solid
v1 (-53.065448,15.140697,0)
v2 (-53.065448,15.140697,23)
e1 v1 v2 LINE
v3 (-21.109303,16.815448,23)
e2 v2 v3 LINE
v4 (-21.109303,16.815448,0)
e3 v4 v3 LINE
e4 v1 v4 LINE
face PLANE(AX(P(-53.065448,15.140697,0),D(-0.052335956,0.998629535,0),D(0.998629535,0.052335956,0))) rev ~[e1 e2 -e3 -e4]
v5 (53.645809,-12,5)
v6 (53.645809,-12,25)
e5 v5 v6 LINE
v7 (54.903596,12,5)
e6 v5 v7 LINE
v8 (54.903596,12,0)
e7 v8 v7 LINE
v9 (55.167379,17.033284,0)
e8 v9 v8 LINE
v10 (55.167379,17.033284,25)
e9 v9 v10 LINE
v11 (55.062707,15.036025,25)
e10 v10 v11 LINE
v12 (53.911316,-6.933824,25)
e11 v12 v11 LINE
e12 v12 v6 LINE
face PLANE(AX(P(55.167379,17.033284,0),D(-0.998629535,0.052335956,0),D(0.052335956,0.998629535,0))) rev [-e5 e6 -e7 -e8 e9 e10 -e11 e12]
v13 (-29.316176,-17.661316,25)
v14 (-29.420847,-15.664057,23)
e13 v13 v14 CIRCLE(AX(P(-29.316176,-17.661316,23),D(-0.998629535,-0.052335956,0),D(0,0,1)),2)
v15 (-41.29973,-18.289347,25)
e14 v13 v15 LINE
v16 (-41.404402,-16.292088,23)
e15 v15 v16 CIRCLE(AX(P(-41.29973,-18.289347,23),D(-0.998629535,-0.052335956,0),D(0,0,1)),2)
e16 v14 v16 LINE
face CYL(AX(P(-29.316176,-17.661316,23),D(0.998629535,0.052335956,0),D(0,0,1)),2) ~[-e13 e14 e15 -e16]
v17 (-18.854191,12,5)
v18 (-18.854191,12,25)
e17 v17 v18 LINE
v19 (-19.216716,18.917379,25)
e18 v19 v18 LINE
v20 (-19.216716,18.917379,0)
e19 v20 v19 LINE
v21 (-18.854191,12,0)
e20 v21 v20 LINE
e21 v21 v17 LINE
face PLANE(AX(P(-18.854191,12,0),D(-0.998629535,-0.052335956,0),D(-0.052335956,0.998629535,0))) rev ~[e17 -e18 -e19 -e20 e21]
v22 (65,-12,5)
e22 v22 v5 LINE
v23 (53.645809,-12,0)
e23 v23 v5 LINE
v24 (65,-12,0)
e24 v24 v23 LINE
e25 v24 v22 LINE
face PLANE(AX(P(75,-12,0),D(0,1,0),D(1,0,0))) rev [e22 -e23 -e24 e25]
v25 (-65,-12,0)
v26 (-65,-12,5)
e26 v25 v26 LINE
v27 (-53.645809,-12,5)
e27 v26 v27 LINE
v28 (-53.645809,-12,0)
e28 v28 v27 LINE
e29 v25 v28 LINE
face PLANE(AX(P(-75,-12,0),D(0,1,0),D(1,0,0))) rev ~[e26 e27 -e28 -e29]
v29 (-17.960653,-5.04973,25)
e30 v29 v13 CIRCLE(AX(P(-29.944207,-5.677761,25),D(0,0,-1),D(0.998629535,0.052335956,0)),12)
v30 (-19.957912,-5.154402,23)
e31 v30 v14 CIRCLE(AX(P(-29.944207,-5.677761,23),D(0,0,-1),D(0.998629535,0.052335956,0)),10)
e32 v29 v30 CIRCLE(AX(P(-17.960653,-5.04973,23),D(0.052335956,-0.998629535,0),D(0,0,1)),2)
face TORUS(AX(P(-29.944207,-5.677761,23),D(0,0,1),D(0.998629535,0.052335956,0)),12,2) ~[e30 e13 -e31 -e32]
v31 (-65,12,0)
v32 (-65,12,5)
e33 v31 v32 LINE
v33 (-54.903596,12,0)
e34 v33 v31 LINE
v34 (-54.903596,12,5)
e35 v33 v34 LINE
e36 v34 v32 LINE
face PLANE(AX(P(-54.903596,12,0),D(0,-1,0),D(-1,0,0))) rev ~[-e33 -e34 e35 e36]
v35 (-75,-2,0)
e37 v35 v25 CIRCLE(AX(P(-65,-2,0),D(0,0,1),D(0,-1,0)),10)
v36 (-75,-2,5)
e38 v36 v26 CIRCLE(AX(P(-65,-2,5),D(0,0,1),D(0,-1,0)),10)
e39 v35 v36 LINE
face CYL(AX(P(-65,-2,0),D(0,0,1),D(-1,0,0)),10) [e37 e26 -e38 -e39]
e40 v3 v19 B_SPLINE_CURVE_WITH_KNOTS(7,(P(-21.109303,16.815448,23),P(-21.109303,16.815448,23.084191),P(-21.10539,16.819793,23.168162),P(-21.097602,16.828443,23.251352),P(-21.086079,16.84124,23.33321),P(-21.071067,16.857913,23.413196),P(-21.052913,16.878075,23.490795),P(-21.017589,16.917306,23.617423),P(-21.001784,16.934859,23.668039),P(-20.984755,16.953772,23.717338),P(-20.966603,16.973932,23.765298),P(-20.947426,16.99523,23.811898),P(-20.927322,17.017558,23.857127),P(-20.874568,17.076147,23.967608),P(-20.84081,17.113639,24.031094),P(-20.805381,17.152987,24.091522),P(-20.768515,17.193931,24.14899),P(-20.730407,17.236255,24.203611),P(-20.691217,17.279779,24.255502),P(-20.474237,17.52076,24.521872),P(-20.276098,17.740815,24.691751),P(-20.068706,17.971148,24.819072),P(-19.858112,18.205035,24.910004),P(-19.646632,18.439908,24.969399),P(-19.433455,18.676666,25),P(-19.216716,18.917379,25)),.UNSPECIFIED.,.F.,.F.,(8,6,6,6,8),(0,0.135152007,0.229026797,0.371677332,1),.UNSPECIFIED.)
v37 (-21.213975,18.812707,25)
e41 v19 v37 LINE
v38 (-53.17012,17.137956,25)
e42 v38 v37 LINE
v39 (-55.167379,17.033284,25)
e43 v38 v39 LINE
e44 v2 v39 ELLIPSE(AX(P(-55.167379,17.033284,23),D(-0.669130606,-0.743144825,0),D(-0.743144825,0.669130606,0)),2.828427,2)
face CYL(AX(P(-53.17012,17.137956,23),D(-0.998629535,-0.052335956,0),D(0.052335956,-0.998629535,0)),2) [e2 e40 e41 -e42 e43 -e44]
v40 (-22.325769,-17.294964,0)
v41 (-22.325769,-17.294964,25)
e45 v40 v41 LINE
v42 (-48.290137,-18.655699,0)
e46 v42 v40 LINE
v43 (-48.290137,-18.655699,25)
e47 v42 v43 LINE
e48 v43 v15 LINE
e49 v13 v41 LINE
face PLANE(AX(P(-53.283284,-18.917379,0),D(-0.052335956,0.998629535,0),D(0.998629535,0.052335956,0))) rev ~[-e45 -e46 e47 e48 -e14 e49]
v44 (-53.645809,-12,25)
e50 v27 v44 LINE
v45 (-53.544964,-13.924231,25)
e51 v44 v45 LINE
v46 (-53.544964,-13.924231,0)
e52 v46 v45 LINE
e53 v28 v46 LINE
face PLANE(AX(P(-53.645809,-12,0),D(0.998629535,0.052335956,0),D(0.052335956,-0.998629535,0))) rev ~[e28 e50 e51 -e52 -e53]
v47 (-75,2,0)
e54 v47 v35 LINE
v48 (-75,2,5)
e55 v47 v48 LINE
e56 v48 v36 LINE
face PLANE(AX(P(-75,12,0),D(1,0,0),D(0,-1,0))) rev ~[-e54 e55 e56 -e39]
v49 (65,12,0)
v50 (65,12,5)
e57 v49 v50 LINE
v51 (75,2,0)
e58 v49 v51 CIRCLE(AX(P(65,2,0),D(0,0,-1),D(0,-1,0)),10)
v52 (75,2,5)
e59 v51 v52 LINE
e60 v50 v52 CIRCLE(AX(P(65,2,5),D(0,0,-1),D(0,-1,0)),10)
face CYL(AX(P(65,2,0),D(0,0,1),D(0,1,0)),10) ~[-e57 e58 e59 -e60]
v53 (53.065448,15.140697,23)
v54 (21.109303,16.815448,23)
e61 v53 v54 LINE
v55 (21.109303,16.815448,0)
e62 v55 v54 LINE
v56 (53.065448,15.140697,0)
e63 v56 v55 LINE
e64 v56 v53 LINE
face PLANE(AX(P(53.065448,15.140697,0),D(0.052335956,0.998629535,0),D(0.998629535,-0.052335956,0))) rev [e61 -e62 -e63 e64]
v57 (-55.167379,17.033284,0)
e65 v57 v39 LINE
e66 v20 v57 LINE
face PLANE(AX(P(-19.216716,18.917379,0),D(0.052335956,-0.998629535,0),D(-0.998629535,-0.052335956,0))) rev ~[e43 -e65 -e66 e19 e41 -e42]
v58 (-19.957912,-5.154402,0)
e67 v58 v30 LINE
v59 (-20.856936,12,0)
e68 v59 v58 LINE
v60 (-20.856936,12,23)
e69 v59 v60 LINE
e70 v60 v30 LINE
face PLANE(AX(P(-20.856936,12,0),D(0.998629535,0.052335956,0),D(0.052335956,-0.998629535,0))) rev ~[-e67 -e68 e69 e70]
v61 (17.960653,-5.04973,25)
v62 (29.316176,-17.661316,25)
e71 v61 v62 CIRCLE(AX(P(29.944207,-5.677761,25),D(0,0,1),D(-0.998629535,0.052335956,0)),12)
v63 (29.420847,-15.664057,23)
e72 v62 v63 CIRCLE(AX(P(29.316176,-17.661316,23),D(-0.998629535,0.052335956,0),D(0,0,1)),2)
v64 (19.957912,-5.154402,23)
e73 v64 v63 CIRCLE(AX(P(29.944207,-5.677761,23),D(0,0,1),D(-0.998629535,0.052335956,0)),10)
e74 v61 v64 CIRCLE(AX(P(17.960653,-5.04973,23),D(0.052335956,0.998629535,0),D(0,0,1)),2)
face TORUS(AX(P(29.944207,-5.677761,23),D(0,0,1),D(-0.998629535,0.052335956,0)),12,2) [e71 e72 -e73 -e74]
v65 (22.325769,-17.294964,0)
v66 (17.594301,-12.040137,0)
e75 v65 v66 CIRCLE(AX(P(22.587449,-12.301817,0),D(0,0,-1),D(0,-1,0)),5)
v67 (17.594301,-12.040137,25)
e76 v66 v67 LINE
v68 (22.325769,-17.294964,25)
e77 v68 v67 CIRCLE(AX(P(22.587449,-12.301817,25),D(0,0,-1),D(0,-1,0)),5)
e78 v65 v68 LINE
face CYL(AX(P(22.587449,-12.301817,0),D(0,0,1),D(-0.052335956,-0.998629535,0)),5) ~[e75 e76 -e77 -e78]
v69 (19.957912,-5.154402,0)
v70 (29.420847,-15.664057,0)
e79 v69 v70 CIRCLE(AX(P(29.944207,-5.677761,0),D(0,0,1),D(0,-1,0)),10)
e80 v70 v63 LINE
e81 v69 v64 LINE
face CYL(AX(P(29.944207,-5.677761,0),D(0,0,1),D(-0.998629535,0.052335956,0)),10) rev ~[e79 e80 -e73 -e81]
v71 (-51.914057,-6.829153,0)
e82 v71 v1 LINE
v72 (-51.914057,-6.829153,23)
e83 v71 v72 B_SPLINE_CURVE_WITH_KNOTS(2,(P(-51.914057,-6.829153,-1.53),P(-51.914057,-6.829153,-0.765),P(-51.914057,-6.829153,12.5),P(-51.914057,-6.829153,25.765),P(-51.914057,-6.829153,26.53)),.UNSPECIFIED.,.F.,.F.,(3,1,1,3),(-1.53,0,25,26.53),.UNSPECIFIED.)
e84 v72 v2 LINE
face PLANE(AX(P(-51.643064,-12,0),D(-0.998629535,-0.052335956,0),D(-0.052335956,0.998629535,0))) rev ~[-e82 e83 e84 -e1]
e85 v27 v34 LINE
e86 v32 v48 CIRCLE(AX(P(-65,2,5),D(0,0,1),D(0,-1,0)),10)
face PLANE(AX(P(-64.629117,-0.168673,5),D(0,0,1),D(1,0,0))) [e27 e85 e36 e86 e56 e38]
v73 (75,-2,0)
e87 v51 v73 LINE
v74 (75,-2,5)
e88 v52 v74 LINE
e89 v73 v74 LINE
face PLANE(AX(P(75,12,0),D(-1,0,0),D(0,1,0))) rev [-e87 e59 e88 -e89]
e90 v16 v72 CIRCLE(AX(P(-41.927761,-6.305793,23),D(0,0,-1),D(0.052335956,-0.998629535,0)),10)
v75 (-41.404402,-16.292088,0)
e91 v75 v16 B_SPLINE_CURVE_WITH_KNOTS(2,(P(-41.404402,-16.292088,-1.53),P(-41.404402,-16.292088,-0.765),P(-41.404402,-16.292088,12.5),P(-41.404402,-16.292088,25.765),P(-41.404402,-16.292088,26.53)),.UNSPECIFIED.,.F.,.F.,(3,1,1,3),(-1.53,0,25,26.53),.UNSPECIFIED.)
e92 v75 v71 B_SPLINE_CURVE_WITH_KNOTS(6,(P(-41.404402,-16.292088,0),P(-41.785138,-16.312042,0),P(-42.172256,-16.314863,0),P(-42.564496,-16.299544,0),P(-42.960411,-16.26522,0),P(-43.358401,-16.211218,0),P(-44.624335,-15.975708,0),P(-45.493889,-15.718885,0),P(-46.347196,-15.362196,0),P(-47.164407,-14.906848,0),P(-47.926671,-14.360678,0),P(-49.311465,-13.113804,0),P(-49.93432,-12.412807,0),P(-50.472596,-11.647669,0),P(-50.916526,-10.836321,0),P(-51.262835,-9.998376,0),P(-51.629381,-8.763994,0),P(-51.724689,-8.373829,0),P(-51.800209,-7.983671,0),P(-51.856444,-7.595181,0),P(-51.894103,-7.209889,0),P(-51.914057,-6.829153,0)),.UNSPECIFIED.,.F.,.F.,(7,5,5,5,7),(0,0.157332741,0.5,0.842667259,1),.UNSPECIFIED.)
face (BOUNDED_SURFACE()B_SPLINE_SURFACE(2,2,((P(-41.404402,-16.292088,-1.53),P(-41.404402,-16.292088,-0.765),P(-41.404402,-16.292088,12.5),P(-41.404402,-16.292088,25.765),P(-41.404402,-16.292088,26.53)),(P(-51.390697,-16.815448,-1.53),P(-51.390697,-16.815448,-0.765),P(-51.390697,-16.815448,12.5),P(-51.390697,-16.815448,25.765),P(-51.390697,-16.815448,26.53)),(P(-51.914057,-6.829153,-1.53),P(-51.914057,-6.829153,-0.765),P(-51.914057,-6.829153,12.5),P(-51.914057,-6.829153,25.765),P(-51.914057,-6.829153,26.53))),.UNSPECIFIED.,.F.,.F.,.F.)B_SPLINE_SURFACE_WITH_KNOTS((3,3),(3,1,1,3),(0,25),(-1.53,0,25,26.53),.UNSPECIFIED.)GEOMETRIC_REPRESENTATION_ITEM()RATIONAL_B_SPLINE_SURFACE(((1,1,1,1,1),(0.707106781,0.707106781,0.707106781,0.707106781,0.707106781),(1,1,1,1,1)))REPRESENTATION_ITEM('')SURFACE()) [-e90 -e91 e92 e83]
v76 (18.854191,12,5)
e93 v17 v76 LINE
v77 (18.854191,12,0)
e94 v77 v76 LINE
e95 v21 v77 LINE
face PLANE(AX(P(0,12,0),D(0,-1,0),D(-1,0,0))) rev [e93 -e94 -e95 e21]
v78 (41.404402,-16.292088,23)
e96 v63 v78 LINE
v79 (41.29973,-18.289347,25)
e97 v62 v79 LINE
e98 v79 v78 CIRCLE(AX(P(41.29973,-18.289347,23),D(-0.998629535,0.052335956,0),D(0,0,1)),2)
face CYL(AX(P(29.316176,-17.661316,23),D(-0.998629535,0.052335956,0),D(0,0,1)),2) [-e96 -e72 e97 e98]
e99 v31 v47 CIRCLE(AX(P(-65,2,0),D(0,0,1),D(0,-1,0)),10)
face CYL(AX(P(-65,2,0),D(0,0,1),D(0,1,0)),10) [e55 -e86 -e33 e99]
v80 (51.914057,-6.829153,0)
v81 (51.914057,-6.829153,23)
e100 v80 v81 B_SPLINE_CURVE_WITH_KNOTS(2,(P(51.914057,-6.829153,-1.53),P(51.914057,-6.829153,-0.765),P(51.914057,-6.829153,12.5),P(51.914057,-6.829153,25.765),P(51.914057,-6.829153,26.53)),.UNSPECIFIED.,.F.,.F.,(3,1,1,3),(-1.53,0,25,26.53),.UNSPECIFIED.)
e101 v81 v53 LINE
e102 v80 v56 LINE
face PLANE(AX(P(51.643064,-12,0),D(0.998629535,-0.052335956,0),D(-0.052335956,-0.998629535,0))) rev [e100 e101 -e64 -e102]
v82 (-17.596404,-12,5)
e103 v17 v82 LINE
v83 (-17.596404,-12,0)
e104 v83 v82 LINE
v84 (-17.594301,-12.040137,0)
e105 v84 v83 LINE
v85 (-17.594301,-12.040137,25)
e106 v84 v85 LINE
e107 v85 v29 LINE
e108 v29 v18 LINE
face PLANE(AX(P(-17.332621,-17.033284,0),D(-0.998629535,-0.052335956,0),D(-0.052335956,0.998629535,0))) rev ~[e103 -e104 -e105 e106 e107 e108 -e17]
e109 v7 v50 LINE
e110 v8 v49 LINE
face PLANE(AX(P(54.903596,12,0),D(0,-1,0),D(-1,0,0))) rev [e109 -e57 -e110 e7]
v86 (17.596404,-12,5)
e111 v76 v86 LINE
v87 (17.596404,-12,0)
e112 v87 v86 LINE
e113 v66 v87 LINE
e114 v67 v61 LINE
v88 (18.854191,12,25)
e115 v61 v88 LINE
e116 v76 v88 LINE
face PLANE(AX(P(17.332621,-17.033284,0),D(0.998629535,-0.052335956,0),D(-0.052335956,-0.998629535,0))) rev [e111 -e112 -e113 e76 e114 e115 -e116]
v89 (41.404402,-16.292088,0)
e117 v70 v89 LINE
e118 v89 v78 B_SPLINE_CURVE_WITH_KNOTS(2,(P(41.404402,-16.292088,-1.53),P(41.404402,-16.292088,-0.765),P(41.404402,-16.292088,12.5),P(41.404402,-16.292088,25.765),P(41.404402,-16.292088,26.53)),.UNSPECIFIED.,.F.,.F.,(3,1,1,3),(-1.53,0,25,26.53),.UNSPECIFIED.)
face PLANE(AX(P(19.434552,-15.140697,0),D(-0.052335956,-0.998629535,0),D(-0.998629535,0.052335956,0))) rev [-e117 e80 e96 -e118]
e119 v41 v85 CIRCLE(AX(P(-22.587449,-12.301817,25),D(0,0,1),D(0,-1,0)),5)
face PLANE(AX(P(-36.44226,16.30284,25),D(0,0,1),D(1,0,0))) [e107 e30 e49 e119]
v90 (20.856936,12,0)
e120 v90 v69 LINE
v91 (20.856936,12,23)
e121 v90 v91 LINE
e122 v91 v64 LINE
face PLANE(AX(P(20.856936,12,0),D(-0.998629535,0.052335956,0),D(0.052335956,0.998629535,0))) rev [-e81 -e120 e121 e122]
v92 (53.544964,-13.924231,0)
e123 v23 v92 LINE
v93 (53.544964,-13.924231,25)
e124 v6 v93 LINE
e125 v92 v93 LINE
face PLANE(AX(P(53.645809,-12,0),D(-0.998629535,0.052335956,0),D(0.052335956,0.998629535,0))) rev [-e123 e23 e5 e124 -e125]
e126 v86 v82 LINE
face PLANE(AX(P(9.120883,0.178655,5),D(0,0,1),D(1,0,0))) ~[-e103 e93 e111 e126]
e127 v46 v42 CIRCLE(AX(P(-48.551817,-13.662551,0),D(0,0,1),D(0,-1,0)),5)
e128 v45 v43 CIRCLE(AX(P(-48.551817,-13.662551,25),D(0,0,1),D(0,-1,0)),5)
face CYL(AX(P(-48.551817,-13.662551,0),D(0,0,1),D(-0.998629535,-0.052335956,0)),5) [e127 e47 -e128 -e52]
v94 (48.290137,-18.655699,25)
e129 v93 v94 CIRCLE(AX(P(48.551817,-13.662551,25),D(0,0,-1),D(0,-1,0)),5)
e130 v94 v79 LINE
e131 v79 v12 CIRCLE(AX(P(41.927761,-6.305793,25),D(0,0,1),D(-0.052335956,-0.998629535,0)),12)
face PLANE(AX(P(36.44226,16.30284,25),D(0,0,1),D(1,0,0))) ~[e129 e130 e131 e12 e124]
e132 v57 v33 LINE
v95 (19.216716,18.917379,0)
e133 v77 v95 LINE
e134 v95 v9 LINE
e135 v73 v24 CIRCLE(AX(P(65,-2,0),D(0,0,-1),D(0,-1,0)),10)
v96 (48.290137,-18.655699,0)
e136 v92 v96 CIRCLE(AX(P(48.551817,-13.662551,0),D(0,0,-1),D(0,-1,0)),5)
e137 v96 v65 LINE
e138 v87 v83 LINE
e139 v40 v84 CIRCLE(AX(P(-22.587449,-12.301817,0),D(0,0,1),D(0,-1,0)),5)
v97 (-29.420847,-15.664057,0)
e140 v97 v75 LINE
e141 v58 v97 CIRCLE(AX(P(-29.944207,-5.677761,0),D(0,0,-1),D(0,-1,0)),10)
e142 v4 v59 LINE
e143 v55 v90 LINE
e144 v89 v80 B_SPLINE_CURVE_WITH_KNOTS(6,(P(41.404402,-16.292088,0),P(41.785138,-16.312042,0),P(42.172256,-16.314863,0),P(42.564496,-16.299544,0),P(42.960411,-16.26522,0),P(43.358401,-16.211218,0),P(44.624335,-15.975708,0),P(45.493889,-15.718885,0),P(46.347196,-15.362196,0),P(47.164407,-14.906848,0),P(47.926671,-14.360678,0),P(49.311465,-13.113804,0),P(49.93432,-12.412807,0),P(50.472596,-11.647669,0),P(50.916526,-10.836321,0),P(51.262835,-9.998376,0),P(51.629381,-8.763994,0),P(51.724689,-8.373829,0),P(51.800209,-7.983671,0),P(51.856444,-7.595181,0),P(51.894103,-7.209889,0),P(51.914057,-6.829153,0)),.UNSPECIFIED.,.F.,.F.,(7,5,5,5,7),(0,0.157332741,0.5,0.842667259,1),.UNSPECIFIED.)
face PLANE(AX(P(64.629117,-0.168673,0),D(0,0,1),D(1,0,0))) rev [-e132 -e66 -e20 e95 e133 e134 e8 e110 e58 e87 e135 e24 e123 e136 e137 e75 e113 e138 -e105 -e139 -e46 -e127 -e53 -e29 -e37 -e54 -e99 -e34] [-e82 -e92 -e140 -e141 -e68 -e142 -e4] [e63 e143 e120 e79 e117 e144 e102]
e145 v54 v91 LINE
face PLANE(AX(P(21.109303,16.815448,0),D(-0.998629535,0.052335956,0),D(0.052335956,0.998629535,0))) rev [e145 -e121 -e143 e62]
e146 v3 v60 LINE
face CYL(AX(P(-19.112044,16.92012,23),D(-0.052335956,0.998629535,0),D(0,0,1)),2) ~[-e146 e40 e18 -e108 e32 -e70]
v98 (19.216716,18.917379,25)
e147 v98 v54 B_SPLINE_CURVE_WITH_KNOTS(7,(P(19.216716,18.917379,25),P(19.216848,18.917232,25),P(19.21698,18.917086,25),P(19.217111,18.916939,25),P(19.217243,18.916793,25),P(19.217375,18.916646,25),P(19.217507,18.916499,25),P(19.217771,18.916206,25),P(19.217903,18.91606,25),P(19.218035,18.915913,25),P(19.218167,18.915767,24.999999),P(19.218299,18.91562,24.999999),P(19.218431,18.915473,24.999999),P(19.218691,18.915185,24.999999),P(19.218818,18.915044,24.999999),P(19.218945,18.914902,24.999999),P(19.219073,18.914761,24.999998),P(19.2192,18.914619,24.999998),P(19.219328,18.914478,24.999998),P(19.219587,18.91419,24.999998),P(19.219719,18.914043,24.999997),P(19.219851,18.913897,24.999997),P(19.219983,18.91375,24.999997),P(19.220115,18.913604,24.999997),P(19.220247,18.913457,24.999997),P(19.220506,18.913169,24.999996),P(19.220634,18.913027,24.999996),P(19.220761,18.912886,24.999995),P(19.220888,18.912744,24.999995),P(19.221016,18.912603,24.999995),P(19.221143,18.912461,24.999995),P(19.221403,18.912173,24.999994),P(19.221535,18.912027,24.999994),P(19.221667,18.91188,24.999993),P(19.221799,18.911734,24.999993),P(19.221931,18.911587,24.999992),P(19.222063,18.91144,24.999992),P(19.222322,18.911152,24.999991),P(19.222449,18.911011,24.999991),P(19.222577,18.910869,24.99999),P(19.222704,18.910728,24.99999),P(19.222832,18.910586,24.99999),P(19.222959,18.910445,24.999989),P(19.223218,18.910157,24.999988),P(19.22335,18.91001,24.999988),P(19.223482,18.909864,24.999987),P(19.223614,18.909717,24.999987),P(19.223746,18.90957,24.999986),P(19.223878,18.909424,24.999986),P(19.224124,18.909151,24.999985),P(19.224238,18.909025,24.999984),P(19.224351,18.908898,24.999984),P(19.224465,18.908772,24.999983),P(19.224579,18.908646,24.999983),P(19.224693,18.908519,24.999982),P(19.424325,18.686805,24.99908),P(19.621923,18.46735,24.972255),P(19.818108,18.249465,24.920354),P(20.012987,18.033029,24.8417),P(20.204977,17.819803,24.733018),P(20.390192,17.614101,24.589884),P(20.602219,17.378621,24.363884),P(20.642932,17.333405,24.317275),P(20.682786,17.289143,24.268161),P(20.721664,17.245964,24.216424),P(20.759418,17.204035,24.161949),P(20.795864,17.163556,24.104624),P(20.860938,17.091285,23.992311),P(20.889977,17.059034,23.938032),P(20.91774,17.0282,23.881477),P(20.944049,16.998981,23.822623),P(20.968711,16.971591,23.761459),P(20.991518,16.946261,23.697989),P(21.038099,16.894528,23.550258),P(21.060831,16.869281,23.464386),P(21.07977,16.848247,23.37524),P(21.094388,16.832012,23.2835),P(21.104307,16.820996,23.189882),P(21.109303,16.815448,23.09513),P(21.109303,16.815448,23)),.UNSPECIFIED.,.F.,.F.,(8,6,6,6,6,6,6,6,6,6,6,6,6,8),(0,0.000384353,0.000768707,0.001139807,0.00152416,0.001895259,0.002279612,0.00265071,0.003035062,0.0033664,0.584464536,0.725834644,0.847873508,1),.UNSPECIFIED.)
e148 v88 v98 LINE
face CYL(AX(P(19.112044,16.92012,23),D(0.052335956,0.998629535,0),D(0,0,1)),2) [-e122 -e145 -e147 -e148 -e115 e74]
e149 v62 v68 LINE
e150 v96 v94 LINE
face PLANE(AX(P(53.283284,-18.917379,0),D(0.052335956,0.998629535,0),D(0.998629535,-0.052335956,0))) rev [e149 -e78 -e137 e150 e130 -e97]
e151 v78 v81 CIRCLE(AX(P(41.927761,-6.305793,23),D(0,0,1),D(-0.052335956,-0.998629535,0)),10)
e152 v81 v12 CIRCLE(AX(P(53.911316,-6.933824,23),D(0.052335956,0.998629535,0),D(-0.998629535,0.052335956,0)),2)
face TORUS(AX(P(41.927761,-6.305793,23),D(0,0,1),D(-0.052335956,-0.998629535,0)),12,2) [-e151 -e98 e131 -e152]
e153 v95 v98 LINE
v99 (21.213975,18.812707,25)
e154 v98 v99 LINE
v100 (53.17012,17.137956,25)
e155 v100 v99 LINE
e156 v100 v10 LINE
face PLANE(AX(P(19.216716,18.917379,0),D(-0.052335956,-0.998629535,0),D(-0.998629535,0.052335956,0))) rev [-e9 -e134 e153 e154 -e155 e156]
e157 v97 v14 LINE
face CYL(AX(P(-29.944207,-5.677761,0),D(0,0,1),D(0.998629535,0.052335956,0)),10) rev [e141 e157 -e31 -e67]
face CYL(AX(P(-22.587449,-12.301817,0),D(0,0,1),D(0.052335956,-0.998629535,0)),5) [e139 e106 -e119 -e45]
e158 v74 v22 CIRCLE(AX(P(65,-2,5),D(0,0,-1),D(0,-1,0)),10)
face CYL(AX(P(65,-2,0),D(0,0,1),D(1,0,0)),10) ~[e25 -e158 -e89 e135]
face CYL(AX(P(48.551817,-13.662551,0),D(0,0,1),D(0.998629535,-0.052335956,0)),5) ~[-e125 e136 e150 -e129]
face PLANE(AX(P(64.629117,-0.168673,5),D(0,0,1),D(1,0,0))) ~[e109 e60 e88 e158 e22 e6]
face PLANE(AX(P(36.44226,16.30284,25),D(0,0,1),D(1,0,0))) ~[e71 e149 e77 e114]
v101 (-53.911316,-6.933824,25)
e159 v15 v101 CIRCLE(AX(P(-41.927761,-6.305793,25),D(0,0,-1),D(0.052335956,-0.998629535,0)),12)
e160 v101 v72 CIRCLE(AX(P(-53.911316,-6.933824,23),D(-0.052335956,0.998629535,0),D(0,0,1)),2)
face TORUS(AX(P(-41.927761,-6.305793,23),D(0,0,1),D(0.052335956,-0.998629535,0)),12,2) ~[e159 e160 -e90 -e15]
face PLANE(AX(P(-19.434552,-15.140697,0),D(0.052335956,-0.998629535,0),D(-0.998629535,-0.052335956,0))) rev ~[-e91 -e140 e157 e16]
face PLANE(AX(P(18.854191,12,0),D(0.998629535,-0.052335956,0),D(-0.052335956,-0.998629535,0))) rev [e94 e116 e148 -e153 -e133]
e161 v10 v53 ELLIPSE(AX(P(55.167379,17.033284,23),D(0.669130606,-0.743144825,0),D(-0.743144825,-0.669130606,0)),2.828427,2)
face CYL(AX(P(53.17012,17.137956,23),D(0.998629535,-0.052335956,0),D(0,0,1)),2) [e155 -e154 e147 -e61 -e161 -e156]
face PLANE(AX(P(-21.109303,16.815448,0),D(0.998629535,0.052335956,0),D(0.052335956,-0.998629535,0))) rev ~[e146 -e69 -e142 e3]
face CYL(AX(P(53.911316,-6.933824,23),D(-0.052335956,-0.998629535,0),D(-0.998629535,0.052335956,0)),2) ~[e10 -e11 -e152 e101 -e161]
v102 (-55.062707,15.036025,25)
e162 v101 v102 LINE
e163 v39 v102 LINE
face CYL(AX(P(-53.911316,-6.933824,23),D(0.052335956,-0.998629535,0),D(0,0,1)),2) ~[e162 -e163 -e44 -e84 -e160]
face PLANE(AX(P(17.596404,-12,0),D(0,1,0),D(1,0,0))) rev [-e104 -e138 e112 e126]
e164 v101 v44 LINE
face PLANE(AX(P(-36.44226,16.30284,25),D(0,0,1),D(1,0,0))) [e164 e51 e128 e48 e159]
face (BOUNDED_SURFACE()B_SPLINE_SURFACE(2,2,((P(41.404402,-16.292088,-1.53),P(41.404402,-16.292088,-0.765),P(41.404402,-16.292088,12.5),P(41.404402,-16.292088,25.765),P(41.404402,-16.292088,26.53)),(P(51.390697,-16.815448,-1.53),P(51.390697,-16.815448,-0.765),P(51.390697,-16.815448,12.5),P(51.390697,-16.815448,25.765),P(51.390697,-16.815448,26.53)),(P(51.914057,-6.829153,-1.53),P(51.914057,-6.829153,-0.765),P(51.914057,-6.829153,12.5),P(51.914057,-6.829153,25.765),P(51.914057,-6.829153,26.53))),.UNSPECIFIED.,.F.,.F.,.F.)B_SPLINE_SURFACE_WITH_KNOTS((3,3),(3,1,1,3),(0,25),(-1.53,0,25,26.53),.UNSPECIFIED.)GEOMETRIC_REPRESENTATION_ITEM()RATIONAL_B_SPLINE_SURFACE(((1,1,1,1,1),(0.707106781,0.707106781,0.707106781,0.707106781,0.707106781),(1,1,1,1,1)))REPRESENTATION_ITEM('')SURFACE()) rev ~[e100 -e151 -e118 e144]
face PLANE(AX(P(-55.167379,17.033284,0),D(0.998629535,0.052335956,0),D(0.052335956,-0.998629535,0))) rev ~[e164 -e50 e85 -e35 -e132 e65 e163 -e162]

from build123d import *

# Parameters (mm, degrees)
F1_DEPTH     = 25
F2_DEPTH     = 5
F3_R         = 10
F4_R         = 5
F6_T1_DEPTH  = 22
F6_T3_DEPTH  = 32
F6_T5_DEPTH  = 32
F6_T7_DEPTH  = 22
F6_T9_DEPTH  = 22
F6_T11_DEPTH = 12
F6_T13_DEPTH = 22
F6_T15_DEPTH = 12
F6_T18_ANGLE = 90
F6_T20_ANGLE = 90
F6_T22_ANGLE = 90
F6_T24_ANGLE = 90
F6_T29_DEPTH = 37
F6_T34_DEPTH = 27
F6_T42_DEPTH = 37
F6_T47_DEPTH = 27
F6_T55_DEPTH = 27
F6_T60_DEPTH = 37
F6_T68_DEPTH = 27
F6_T73_DEPTH = 37


# Not quite as in the source:
# - a fillet or chamfer that OpenCascade refuses, or shapes differently, is made with other operations: its cross-section is extruded or revolved along the edge and cut away or added
# - a feature names something its author has since deleted; it is built from what else it names


with BuildPart() as f1:
    # F0 (on Top) → F1 (new body)
    with BuildSketch(Plane.XY):
        Polygon((-52.9008508874, 12), (-53.065447856, 15.1406972562), (-21.1093027438, 16.815447856), (-20.8569358154, 12), (-18.8541911234, 12), (-19.2167155868, 18.917378838), (-55.167378838, 17.0332844132), (-54.9035955794, 12), align=None)
        Polygon((-51.6430641846, -12), (-52.9008508874, 12), (-54.9035955794, 12), (-53.6458088766, -12), align=None)
        Polygon((-18.8541911234, 12), (-20.8569358154, 12), (-19.5991491126, -12), (-17.5964044206, -12), align=None)
        Polygon((-51.3906972562, -16.815447856), (-51.6430641846, -12), (-53.6458088766, -12), (-53.2832844132, -18.917378838), (-17.332621162, -17.0332844132), (-17.5964044206, -12), (-19.5991491126, -12), (-19.434552144, -15.1406972562), align=None)
    extrude(amount=F1_DEPTH)

    # F0 (on Top) → F2 (join)
    with BuildSketch(Plane.XY):
        Polygon((-53.6458088766, -12), (-54.9035955794, 12), (-75, 12), (-75, -12), align=None)
        Polygon((0, 12), (-18.8541911234, 12), (-17.5964044206, -12), (0, -12), align=None)
    extrude(amount=F2_DEPTH)

    # F3
    f3_edges = [f1.edges().sort_by_distance(p)[0] for p in [
        (-75, -12, 2.5),
        (-75, 12, 2.5),
        (-51.390697, -16.815448, 12.5),
        (-19.434552, -15.140697, 12.5),
    ]]
    fillet(f3_edges, radius=F3_R)

    # F4
    f4_edges = [f1.edges().sort_by_distance(p)[0] for p in [
        (-53.283284, -18.917379, 12.5),
        (-17.332621, -17.033284, 12.5),
    ]]
    fillet(f4_edges, radius=F4_R)

    # F5: F1 across plane


with BuildPart() as f1_1:
    add(f1.part)
    add(f1.part.mirror(Plane.YZ))

    # F6: fillet of radius 2 on 12 edges, made by hand

    # F6_s2 → F6_t1 (cut)
    with BuildSketch(Plane(origin=(0.214725091, -4.0971988118, 0), x_dir=(0, 0, 1), z_dir=(-0.0523359562, 0.9986295348, 0))):
        with BuildLine():
            ThreePointArc((25, -54.2003206349), (24.4142135624, -52.7861070725), (23, -52.2003206349))
            Line((23, -52.2003206349), (25, -52.2003206349))
            Line((25, -52.2003206349), (25, -54.2003206349))
        make_face()
    extrude(amount=F6_T1_DEPTH, mode=Mode.SUBTRACT)

    # F6_s4 → F6_t3 (cut)
    with BuildSketch(Plane(origin=(-52.1287819096, -2.7319536966, 0), x_dir=(0, 0, 1), z_dir=(0.9986295348, 0.0523359562, 0))):
        with BuildLine():
            ThreePointArc((23, -17.8971784138), (24.4142135624, -18.4829648514), (25, -19.8971784138))
            Line((25, -19.8971784138), (25, -17.8971784138))
            Line((25, -17.8971784138), (23, -17.8971784138))
        make_face()
    extrude(amount=F6_T3_DEPTH, mode=Mode.SUBTRACT)

    # F6_s6 → F6_t5 (cut)
    with BuildSketch(Plane(origin=(52.1287819096, -2.7319536966, 0), x_dir=(0, 0, 1), z_dir=(-0.9986295348, 0.0523359562, 0))):
        with BuildLine():
            ThreePointArc((25, 19.8971784138), (24.4142135624, 18.4829648514), (23, 17.8971784138))
            Line((23, 17.8971784138), (25, 17.8971784138))
            Line((25, 17.8971784138), (25, 19.8971784138))
        make_face()
    extrude(amount=F6_T5_DEPTH, mode=Mode.SUBTRACT)

    # F6_s8 → F6_t7 (cut)
    with BuildSketch(Plane(origin=(-0.214725091, -4.0971988118, 0), x_dir=(0, 0, 1), z_dir=(0.0523359562, 0.9986295348, 0))):
        with BuildLine():
            ThreePointArc((23, 52.2003206349), (24.4142135624, 52.7861070725), (25, 54.2003206349))
            Line((25, 54.2003206349), (25, 52.2003206349))
            Line((25, 52.2003206349), (23, 52.2003206349))
        make_face()
    extrude(amount=F6_T7_DEPTH, mode=Mode.SUBTRACT)

    # F6_s10 → F6_t9 (cut)
    with BuildSketch(Plane(origin=(0.9366659463, 17.8726509528, 0), x_dir=(0, 0, 1), z_dir=(-0.0523359562, -0.9986295348, 0))):
        with BuildLine():
            ThreePointArc((25, -18.2003206349), (24.4142135624, -19.6145341972), (23, -20.2003206349))
            Line((23, -20.2003206349), (25, -20.2003206349))
            Line((25, -20.2003206349), (25, -18.2003206349))
        make_face()
    extrude(amount=F6_T9_DEPTH, mode=Mode.SUBTRACT)

    # F6_s12 → F6_t11 (cut)
    with BuildSketch(Plane(origin=(30.158932145, -1.5805626593, 0), x_dir=(0, 0, 1), z_dir=(0.9986295348, -0.0523359562, 0))):
        with BuildLine():
            ThreePointArc((25, 16.1028215862), (24.4142135624, 14.6886080238), (23, 14.1028215862))
            Line((23, 14.1028215862), (25, 14.1028215862))
            Line((25, 14.1028215862), (25, 16.1028215862))
        make_face()
    extrude(amount=F6_T11_DEPTH, mode=Mode.SUBTRACT)

    # F6_s14 → F6_t13 (cut)
    with BuildSketch(Plane(origin=(-0.9366659463, 17.8726509528, 0), x_dir=(0, 0, 1), z_dir=(0.0523359562, -0.9986295348, 0))):
        with BuildLine():
            ThreePointArc((25, 18.2003206349), (24.4142135624, 19.6145341972), (23, 20.2003206349))
            Line((23, 20.2003206349), (25, 20.2003206349))
            Line((25, 20.2003206349), (25, 18.2003206349))
        make_face()
    extrude(amount=F6_T13_DEPTH, mode=Mode.SUBTRACT)

    # F6_s16 → F6_t15 (cut)
    with BuildSketch(Plane(origin=(-30.158932145, -1.5805626593, 0), x_dir=(0, 0, 1), z_dir=(-0.9986295348, -0.0523359562, 0))):
        with BuildLine():
            ThreePointArc((25, -16.1028215862), (24.4142135624, -14.6886080238), (23, -14.1028215862))
            Line((23, -14.1028215862), (25, -14.1028215862))
            Line((25, -14.1028215862), (25, -16.1028215862))
        make_face()
    extrude(amount=F6_T15_DEPTH, mode=Mode.SUBTRACT)

    # F6_s17 → F6_t18 (revolve, cut)
    with BuildSketch(Plane(origin=(-42.1424865621, -2.2085941342, 0), x_dir=(0, 0, 1), z_dir=(0.9986295348, 0.0523359562, 0))):
        with BuildLine():
            ThreePointArc((25, 16.1028215862), (24.4142135624, 14.6886080238), (23, 14.1028215862))
            Line((23, 14.1028215862), (25, 14.1028215862))
            Line((25, 14.1028215862), (25, 16.1028215862))
        make_face()
    revolve(axis=Axis((-41.9277614711, -6.305792946, 25), (0, 0, -1)), revolution_arc=F6_T18_ANGLE, mode=Mode.SUBTRACT)

    # F6_s19 → F6_t20 (revolve, cut)
    with BuildSketch(Plane(origin=(-0.214725091, -4.0971988118, 0), x_dir=(0, 0, 1), z_dir=(0.0523359562, 0.9986295348, 0))):
        with BuildLine():
            ThreePointArc((25, 18.2003206349), (24.4142135624, 19.6145341972), (23, 20.2003206349))
            Line((23, 20.2003206349), (25, 20.2003206349))
            Line((25, 20.2003206349), (25, 18.2003206349))
        make_face()
    revolve(axis=Axis((29.944207054, -5.6777614711, 25), (0, 0, 1)), revolution_arc=F6_T20_ANGLE, mode=Mode.SUBTRACT)

    # F6_s21 → F6_t22 (revolve, cut)
    with BuildSketch(Plane(origin=(42.1424865621, -2.2085941342, 0), x_dir=(0, 0, 1), z_dir=(-0.9986295348, 0.0523359562, 0))):
        with BuildLine():
            ThreePointArc((25, -16.1028215862), (24.4142135624, -14.6886080238), (23, -14.1028215862))
            Line((23, -14.1028215862), (25, -14.1028215862))
            Line((25, -14.1028215862), (25, -16.1028215862))
        make_face()
    revolve(axis=Axis((41.9277614711, -6.305792946, 25), (0, 0, 1)), revolution_arc=F6_T22_ANGLE, mode=Mode.SUBTRACT)

    # F6_s23 → F6_t24 (revolve, cut)
    with BuildSketch(Plane(origin=(0.214725091, -4.0971988118, 0), x_dir=(0, 0, 1), z_dir=(-0.0523359562, 0.9986295348, 0))):
        with BuildLine():
            ThreePointArc((25, -18.2003206349), (24.4142135624, -19.6145341972), (23, -20.2003206349))
            Line((23, -20.2003206349), (25, -20.2003206349))
            Line((25, -20.2003206349), (25, -18.2003206349))
        make_face()
    revolve(axis=Axis((-29.944207054, -5.6777614711, 25), (0, 0, -1)), revolution_arc=F6_T24_ANGLE, mode=Mode.SUBTRACT)


with BuildPart() as f6_tool27:
    # F6_s28 → F6_t29 (new body)
    with BuildSketch(Plane(origin=(-57.1219295834, -2.9936334778, 0), x_dir=(0, 0, 1), z_dir=(0.9986295348, 0.0523359562, 0))):
        with BuildLine():
            ThreePointArc((23, -17.8971784138), (24.4142135624, -18.4829648514), (25, -19.8971784138))
            Line((25, -19.8971784138), (25, -17.8971784138))
            Line((25, -17.8971784138), (23, -17.8971784138))
        make_face()
    extrude(amount=F6_T29_DEPTH)

    split(bisect_by=Plane(origin=(-52.1287819096, -2.7319536966, 0), x_dir=(0, 0, 1), z_dir=(-0.9986295348, -0.0523359562, 0)), keep=Keep.TOP)

    split(bisect_by=Plane(origin=(-54.1260409791, -2.8366256091, 0), x_dir=(0, 0, 1), z_dir=(0.9986295348, 0.0523359562, 0)), keep=Keep.TOP)


with BuildPart() as f6_tool32:
    # F6_s33 → F6_t34 (new body)
    with BuildSketch(Plane(origin=(0.214725091, -4.0971988118, 0), x_dir=(0, 0, 1), z_dir=(-0.0523359562, 0.9986295348, 0))):
        with BuildLine():
            ThreePointArc((25, -54.2003206349), (24.4142135624, -52.7861070725), (23, -52.2003206349))
            Line((23, -52.2003206349), (25, -52.2003206349))
            Line((25, -52.2003206349), (25, -54.2003206349))
        make_face()
    extrude(amount=F6_T34_DEPTH)

    split(bisect_by=Plane(origin=(-0.9366659463, 17.8726509528, 0), x_dir=(0, 0, 1), z_dir=(-0.0523359562, 0.9986295348, 0)), keep=Keep.TOP)

    split(bisect_by=Plane(origin=(-1.0413378588, 19.8699100223, 0), x_dir=(0, 0, 1), z_dir=(0.0523359562, -0.9986295348, 0)), keep=Keep.TOP)


with BuildPart() as f6_tool27_1:
    add(f6_tool27.part)

    # F6_t37: intersect F6_tool32
    add(f6_tool32.part, mode=Mode.INTERSECT)


with BuildPart() as f1_2:
    add(f1_1.part)

    # F6_t25: cut F6_tool27
    add(f6_tool27_1.part, mode=Mode.SUBTRACT)


with BuildPart() as f6_tool40:
    # F6_s41 → F6_t42 (new body)
    with BuildSketch(Plane(origin=(-52.1287819096, -2.7319536966, 0), x_dir=(0, 0, 1), z_dir=(0.9986295348, 0.0523359562, 0))):
        with BuildLine():
            ThreePointArc((23, -17.8971784138), (24.4142135624, -18.4829648514), (25, -19.8971784138))
            Line((25, -19.8971784138), (25, -17.8971784138))
            Line((25, -17.8971784138), (23, -17.8971784138))
        make_face()
    extrude(amount=F6_T42_DEPTH)

    split(bisect_by=Plane(origin=(-20.1726367975, -1.0572030968, 0), x_dir=(0, 0, 1), z_dir=(0.9986295348, 0.0523359562, 0)), keep=Keep.TOP)

    split(bisect_by=Plane(origin=(-18.175377728, -0.9525311844, 0), x_dir=(0, 0, 1), z_dir=(-0.9986295348, -0.0523359562, 0)), keep=Keep.TOP)


with BuildPart() as f6_tool45:
    # F6_s46 → F6_t47 (new body)
    with BuildSketch(Plane(origin=(-1.1983457276, 22.8657986266, 0), x_dir=(0, 0, 1), z_dir=(0.0523359562, -0.9986295348, 0))):
        with BuildLine():
            ThreePointArc((25, 18.2003206349), (24.4142135624, 19.6145341972), (23, 20.2003206349))
            Line((23, 20.2003206349), (25, 20.2003206349))
            Line((25, 20.2003206349), (25, 18.2003206349))
        make_face()
    extrude(amount=F6_T47_DEPTH)

    split(bisect_by=Plane(origin=(-0.9366659463, 17.8726509528, 0), x_dir=(0, 0, 1), z_dir=(-0.0523359562, 0.9986295348, 0)), keep=Keep.TOP)

    split(bisect_by=Plane(origin=(-1.0413378588, 19.8699100223, 0), x_dir=(0, 0, 1), z_dir=(0.0523359562, -0.9986295348, 0)), keep=Keep.TOP)


with BuildPart() as f6_tool40_1:
    add(f6_tool40.part)

    # F6_t50: intersect F6_tool45
    add(f6_tool45.part, mode=Mode.INTERSECT)


with BuildPart() as f1_3:
    add(f1_2.part)

    # F6_t38: cut F6_tool40
    add(f6_tool40_1.part, mode=Mode.SUBTRACT)


with BuildPart() as f6_tool53:
    # F6_s54 → F6_t55 (new body)
    with BuildSketch(Plane(origin=(-0.214725091, -4.0971988118, 0), x_dir=(0, 0, 1), z_dir=(0.0523359562, 0.9986295348, 0))):
        with BuildLine():
            ThreePointArc((23, 52.2003206349), (24.4142135624, 52.7861070725), (25, 54.2003206349))
            Line((25, 54.2003206349), (25, 52.2003206349))
            Line((25, 52.2003206349), (23, 52.2003206349))
        make_face()
    extrude(amount=F6_T55_DEPTH)

    split(bisect_by=Plane(origin=(0.9366659463, 17.8726509528, 0), x_dir=(0, 0, 1), z_dir=(0.0523359562, 0.9986295348, 0)), keep=Keep.TOP)

    split(bisect_by=Plane(origin=(1.0413378588, 19.8699100223, 0), x_dir=(0, 0, 1), z_dir=(-0.0523359562, -0.9986295348, 0)), keep=Keep.TOP)


with BuildPart() as f6_tool58:
    # F6_s59 → F6_t60 (new body)
    with BuildSketch(Plane(origin=(57.1219295834, -2.9936334778, 0), x_dir=(0, 0, 1), z_dir=(-0.9986295348, 0.0523359562, 0))):
        with BuildLine():
            ThreePointArc((25, 19.8971784138), (24.4142135624, 18.4829648514), (23, 17.8971784138))
            Line((23, 17.8971784138), (25, 17.8971784138))
            Line((25, 17.8971784138), (25, 19.8971784138))
        make_face()
    extrude(amount=F6_T60_DEPTH)

    split(bisect_by=Plane(origin=(52.1287819096, -2.7319536966, 0), x_dir=(0, 0, 1), z_dir=(0.9986295348, -0.0523359562, 0)), keep=Keep.TOP)

    split(bisect_by=Plane(origin=(54.1260409791, -2.8366256091, 0), x_dir=(0, 0, 1), z_dir=(-0.9986295348, 0.0523359562, 0)), keep=Keep.TOP)


with BuildPart() as f6_tool53_1:
    add(f6_tool53.part)

    # F6_t63: intersect F6_tool58
    add(f6_tool58.part, mode=Mode.INTERSECT)


with BuildPart() as f1_4:
    add(f1_3.part)

    # F6_t51: cut F6_tool53
    add(f6_tool53_1.part, mode=Mode.SUBTRACT)


with BuildPart() as f6_tool66:
    # F6_s67 → F6_t68 (new body)
    with BuildSketch(Plane(origin=(1.1983457276, 22.8657986266, 0), x_dir=(0, 0, 1), z_dir=(-0.0523359562, -0.9986295348, 0))):
        with BuildLine():
            ThreePointArc((25, -18.2003206349), (24.4142135624, -19.6145341972), (23, -20.2003206349))
            Line((23, -20.2003206349), (25, -20.2003206349))
            Line((25, -20.2003206349), (25, -18.2003206349))
        make_face()
    extrude(amount=F6_T68_DEPTH)

    split(bisect_by=Plane(origin=(0.9366659463, 17.8726509528, 0), x_dir=(0, 0, 1), z_dir=(0.0523359562, 0.9986295348, 0)), keep=Keep.TOP)

    split(bisect_by=Plane(origin=(1.0413378588, 19.8699100223, 0), x_dir=(0, 0, 1), z_dir=(-0.0523359562, -0.9986295348, 0)), keep=Keep.TOP)


with BuildPart() as f6_tool71:
    # F6_s72 → F6_t73 (new body)
    with BuildSketch(Plane(origin=(52.1287819096, -2.7319536966, 0), x_dir=(0, 0, 1), z_dir=(-0.9986295348, 0.0523359562, 0))):
        with BuildLine():
            ThreePointArc((25, 19.8971784138), (24.4142135624, 18.4829648514), (23, 17.8971784138))
            Line((23, 17.8971784138), (25, 17.8971784138))
            Line((25, 17.8971784138), (25, 19.8971784138))
        make_face()
    extrude(amount=F6_T73_DEPTH)

    split(bisect_by=Plane(origin=(20.1726367975, -1.0572030968, 0), x_dir=(0, 0, 1), z_dir=(-0.9986295348, 0.0523359562, 0)), keep=Keep.TOP)

    split(bisect_by=Plane(origin=(18.175377728, -0.9525311844, 0), x_dir=(0, 0, 1), z_dir=(0.9986295348, -0.0523359562, 0)), keep=Keep.TOP)


with BuildPart() as f6_tool66_1:
    add(f6_tool66.part)

    # F6_t76: intersect F6_tool71
    add(f6_tool71.part, mode=Mode.INTERSECT)


with BuildPart() as f1_5:
    add(f1_4.part)

    # F6_t64: cut F6_tool66
    add(f6_tool66_1.part, mode=Mode.SUBTRACT)


solid = f1_5.part
